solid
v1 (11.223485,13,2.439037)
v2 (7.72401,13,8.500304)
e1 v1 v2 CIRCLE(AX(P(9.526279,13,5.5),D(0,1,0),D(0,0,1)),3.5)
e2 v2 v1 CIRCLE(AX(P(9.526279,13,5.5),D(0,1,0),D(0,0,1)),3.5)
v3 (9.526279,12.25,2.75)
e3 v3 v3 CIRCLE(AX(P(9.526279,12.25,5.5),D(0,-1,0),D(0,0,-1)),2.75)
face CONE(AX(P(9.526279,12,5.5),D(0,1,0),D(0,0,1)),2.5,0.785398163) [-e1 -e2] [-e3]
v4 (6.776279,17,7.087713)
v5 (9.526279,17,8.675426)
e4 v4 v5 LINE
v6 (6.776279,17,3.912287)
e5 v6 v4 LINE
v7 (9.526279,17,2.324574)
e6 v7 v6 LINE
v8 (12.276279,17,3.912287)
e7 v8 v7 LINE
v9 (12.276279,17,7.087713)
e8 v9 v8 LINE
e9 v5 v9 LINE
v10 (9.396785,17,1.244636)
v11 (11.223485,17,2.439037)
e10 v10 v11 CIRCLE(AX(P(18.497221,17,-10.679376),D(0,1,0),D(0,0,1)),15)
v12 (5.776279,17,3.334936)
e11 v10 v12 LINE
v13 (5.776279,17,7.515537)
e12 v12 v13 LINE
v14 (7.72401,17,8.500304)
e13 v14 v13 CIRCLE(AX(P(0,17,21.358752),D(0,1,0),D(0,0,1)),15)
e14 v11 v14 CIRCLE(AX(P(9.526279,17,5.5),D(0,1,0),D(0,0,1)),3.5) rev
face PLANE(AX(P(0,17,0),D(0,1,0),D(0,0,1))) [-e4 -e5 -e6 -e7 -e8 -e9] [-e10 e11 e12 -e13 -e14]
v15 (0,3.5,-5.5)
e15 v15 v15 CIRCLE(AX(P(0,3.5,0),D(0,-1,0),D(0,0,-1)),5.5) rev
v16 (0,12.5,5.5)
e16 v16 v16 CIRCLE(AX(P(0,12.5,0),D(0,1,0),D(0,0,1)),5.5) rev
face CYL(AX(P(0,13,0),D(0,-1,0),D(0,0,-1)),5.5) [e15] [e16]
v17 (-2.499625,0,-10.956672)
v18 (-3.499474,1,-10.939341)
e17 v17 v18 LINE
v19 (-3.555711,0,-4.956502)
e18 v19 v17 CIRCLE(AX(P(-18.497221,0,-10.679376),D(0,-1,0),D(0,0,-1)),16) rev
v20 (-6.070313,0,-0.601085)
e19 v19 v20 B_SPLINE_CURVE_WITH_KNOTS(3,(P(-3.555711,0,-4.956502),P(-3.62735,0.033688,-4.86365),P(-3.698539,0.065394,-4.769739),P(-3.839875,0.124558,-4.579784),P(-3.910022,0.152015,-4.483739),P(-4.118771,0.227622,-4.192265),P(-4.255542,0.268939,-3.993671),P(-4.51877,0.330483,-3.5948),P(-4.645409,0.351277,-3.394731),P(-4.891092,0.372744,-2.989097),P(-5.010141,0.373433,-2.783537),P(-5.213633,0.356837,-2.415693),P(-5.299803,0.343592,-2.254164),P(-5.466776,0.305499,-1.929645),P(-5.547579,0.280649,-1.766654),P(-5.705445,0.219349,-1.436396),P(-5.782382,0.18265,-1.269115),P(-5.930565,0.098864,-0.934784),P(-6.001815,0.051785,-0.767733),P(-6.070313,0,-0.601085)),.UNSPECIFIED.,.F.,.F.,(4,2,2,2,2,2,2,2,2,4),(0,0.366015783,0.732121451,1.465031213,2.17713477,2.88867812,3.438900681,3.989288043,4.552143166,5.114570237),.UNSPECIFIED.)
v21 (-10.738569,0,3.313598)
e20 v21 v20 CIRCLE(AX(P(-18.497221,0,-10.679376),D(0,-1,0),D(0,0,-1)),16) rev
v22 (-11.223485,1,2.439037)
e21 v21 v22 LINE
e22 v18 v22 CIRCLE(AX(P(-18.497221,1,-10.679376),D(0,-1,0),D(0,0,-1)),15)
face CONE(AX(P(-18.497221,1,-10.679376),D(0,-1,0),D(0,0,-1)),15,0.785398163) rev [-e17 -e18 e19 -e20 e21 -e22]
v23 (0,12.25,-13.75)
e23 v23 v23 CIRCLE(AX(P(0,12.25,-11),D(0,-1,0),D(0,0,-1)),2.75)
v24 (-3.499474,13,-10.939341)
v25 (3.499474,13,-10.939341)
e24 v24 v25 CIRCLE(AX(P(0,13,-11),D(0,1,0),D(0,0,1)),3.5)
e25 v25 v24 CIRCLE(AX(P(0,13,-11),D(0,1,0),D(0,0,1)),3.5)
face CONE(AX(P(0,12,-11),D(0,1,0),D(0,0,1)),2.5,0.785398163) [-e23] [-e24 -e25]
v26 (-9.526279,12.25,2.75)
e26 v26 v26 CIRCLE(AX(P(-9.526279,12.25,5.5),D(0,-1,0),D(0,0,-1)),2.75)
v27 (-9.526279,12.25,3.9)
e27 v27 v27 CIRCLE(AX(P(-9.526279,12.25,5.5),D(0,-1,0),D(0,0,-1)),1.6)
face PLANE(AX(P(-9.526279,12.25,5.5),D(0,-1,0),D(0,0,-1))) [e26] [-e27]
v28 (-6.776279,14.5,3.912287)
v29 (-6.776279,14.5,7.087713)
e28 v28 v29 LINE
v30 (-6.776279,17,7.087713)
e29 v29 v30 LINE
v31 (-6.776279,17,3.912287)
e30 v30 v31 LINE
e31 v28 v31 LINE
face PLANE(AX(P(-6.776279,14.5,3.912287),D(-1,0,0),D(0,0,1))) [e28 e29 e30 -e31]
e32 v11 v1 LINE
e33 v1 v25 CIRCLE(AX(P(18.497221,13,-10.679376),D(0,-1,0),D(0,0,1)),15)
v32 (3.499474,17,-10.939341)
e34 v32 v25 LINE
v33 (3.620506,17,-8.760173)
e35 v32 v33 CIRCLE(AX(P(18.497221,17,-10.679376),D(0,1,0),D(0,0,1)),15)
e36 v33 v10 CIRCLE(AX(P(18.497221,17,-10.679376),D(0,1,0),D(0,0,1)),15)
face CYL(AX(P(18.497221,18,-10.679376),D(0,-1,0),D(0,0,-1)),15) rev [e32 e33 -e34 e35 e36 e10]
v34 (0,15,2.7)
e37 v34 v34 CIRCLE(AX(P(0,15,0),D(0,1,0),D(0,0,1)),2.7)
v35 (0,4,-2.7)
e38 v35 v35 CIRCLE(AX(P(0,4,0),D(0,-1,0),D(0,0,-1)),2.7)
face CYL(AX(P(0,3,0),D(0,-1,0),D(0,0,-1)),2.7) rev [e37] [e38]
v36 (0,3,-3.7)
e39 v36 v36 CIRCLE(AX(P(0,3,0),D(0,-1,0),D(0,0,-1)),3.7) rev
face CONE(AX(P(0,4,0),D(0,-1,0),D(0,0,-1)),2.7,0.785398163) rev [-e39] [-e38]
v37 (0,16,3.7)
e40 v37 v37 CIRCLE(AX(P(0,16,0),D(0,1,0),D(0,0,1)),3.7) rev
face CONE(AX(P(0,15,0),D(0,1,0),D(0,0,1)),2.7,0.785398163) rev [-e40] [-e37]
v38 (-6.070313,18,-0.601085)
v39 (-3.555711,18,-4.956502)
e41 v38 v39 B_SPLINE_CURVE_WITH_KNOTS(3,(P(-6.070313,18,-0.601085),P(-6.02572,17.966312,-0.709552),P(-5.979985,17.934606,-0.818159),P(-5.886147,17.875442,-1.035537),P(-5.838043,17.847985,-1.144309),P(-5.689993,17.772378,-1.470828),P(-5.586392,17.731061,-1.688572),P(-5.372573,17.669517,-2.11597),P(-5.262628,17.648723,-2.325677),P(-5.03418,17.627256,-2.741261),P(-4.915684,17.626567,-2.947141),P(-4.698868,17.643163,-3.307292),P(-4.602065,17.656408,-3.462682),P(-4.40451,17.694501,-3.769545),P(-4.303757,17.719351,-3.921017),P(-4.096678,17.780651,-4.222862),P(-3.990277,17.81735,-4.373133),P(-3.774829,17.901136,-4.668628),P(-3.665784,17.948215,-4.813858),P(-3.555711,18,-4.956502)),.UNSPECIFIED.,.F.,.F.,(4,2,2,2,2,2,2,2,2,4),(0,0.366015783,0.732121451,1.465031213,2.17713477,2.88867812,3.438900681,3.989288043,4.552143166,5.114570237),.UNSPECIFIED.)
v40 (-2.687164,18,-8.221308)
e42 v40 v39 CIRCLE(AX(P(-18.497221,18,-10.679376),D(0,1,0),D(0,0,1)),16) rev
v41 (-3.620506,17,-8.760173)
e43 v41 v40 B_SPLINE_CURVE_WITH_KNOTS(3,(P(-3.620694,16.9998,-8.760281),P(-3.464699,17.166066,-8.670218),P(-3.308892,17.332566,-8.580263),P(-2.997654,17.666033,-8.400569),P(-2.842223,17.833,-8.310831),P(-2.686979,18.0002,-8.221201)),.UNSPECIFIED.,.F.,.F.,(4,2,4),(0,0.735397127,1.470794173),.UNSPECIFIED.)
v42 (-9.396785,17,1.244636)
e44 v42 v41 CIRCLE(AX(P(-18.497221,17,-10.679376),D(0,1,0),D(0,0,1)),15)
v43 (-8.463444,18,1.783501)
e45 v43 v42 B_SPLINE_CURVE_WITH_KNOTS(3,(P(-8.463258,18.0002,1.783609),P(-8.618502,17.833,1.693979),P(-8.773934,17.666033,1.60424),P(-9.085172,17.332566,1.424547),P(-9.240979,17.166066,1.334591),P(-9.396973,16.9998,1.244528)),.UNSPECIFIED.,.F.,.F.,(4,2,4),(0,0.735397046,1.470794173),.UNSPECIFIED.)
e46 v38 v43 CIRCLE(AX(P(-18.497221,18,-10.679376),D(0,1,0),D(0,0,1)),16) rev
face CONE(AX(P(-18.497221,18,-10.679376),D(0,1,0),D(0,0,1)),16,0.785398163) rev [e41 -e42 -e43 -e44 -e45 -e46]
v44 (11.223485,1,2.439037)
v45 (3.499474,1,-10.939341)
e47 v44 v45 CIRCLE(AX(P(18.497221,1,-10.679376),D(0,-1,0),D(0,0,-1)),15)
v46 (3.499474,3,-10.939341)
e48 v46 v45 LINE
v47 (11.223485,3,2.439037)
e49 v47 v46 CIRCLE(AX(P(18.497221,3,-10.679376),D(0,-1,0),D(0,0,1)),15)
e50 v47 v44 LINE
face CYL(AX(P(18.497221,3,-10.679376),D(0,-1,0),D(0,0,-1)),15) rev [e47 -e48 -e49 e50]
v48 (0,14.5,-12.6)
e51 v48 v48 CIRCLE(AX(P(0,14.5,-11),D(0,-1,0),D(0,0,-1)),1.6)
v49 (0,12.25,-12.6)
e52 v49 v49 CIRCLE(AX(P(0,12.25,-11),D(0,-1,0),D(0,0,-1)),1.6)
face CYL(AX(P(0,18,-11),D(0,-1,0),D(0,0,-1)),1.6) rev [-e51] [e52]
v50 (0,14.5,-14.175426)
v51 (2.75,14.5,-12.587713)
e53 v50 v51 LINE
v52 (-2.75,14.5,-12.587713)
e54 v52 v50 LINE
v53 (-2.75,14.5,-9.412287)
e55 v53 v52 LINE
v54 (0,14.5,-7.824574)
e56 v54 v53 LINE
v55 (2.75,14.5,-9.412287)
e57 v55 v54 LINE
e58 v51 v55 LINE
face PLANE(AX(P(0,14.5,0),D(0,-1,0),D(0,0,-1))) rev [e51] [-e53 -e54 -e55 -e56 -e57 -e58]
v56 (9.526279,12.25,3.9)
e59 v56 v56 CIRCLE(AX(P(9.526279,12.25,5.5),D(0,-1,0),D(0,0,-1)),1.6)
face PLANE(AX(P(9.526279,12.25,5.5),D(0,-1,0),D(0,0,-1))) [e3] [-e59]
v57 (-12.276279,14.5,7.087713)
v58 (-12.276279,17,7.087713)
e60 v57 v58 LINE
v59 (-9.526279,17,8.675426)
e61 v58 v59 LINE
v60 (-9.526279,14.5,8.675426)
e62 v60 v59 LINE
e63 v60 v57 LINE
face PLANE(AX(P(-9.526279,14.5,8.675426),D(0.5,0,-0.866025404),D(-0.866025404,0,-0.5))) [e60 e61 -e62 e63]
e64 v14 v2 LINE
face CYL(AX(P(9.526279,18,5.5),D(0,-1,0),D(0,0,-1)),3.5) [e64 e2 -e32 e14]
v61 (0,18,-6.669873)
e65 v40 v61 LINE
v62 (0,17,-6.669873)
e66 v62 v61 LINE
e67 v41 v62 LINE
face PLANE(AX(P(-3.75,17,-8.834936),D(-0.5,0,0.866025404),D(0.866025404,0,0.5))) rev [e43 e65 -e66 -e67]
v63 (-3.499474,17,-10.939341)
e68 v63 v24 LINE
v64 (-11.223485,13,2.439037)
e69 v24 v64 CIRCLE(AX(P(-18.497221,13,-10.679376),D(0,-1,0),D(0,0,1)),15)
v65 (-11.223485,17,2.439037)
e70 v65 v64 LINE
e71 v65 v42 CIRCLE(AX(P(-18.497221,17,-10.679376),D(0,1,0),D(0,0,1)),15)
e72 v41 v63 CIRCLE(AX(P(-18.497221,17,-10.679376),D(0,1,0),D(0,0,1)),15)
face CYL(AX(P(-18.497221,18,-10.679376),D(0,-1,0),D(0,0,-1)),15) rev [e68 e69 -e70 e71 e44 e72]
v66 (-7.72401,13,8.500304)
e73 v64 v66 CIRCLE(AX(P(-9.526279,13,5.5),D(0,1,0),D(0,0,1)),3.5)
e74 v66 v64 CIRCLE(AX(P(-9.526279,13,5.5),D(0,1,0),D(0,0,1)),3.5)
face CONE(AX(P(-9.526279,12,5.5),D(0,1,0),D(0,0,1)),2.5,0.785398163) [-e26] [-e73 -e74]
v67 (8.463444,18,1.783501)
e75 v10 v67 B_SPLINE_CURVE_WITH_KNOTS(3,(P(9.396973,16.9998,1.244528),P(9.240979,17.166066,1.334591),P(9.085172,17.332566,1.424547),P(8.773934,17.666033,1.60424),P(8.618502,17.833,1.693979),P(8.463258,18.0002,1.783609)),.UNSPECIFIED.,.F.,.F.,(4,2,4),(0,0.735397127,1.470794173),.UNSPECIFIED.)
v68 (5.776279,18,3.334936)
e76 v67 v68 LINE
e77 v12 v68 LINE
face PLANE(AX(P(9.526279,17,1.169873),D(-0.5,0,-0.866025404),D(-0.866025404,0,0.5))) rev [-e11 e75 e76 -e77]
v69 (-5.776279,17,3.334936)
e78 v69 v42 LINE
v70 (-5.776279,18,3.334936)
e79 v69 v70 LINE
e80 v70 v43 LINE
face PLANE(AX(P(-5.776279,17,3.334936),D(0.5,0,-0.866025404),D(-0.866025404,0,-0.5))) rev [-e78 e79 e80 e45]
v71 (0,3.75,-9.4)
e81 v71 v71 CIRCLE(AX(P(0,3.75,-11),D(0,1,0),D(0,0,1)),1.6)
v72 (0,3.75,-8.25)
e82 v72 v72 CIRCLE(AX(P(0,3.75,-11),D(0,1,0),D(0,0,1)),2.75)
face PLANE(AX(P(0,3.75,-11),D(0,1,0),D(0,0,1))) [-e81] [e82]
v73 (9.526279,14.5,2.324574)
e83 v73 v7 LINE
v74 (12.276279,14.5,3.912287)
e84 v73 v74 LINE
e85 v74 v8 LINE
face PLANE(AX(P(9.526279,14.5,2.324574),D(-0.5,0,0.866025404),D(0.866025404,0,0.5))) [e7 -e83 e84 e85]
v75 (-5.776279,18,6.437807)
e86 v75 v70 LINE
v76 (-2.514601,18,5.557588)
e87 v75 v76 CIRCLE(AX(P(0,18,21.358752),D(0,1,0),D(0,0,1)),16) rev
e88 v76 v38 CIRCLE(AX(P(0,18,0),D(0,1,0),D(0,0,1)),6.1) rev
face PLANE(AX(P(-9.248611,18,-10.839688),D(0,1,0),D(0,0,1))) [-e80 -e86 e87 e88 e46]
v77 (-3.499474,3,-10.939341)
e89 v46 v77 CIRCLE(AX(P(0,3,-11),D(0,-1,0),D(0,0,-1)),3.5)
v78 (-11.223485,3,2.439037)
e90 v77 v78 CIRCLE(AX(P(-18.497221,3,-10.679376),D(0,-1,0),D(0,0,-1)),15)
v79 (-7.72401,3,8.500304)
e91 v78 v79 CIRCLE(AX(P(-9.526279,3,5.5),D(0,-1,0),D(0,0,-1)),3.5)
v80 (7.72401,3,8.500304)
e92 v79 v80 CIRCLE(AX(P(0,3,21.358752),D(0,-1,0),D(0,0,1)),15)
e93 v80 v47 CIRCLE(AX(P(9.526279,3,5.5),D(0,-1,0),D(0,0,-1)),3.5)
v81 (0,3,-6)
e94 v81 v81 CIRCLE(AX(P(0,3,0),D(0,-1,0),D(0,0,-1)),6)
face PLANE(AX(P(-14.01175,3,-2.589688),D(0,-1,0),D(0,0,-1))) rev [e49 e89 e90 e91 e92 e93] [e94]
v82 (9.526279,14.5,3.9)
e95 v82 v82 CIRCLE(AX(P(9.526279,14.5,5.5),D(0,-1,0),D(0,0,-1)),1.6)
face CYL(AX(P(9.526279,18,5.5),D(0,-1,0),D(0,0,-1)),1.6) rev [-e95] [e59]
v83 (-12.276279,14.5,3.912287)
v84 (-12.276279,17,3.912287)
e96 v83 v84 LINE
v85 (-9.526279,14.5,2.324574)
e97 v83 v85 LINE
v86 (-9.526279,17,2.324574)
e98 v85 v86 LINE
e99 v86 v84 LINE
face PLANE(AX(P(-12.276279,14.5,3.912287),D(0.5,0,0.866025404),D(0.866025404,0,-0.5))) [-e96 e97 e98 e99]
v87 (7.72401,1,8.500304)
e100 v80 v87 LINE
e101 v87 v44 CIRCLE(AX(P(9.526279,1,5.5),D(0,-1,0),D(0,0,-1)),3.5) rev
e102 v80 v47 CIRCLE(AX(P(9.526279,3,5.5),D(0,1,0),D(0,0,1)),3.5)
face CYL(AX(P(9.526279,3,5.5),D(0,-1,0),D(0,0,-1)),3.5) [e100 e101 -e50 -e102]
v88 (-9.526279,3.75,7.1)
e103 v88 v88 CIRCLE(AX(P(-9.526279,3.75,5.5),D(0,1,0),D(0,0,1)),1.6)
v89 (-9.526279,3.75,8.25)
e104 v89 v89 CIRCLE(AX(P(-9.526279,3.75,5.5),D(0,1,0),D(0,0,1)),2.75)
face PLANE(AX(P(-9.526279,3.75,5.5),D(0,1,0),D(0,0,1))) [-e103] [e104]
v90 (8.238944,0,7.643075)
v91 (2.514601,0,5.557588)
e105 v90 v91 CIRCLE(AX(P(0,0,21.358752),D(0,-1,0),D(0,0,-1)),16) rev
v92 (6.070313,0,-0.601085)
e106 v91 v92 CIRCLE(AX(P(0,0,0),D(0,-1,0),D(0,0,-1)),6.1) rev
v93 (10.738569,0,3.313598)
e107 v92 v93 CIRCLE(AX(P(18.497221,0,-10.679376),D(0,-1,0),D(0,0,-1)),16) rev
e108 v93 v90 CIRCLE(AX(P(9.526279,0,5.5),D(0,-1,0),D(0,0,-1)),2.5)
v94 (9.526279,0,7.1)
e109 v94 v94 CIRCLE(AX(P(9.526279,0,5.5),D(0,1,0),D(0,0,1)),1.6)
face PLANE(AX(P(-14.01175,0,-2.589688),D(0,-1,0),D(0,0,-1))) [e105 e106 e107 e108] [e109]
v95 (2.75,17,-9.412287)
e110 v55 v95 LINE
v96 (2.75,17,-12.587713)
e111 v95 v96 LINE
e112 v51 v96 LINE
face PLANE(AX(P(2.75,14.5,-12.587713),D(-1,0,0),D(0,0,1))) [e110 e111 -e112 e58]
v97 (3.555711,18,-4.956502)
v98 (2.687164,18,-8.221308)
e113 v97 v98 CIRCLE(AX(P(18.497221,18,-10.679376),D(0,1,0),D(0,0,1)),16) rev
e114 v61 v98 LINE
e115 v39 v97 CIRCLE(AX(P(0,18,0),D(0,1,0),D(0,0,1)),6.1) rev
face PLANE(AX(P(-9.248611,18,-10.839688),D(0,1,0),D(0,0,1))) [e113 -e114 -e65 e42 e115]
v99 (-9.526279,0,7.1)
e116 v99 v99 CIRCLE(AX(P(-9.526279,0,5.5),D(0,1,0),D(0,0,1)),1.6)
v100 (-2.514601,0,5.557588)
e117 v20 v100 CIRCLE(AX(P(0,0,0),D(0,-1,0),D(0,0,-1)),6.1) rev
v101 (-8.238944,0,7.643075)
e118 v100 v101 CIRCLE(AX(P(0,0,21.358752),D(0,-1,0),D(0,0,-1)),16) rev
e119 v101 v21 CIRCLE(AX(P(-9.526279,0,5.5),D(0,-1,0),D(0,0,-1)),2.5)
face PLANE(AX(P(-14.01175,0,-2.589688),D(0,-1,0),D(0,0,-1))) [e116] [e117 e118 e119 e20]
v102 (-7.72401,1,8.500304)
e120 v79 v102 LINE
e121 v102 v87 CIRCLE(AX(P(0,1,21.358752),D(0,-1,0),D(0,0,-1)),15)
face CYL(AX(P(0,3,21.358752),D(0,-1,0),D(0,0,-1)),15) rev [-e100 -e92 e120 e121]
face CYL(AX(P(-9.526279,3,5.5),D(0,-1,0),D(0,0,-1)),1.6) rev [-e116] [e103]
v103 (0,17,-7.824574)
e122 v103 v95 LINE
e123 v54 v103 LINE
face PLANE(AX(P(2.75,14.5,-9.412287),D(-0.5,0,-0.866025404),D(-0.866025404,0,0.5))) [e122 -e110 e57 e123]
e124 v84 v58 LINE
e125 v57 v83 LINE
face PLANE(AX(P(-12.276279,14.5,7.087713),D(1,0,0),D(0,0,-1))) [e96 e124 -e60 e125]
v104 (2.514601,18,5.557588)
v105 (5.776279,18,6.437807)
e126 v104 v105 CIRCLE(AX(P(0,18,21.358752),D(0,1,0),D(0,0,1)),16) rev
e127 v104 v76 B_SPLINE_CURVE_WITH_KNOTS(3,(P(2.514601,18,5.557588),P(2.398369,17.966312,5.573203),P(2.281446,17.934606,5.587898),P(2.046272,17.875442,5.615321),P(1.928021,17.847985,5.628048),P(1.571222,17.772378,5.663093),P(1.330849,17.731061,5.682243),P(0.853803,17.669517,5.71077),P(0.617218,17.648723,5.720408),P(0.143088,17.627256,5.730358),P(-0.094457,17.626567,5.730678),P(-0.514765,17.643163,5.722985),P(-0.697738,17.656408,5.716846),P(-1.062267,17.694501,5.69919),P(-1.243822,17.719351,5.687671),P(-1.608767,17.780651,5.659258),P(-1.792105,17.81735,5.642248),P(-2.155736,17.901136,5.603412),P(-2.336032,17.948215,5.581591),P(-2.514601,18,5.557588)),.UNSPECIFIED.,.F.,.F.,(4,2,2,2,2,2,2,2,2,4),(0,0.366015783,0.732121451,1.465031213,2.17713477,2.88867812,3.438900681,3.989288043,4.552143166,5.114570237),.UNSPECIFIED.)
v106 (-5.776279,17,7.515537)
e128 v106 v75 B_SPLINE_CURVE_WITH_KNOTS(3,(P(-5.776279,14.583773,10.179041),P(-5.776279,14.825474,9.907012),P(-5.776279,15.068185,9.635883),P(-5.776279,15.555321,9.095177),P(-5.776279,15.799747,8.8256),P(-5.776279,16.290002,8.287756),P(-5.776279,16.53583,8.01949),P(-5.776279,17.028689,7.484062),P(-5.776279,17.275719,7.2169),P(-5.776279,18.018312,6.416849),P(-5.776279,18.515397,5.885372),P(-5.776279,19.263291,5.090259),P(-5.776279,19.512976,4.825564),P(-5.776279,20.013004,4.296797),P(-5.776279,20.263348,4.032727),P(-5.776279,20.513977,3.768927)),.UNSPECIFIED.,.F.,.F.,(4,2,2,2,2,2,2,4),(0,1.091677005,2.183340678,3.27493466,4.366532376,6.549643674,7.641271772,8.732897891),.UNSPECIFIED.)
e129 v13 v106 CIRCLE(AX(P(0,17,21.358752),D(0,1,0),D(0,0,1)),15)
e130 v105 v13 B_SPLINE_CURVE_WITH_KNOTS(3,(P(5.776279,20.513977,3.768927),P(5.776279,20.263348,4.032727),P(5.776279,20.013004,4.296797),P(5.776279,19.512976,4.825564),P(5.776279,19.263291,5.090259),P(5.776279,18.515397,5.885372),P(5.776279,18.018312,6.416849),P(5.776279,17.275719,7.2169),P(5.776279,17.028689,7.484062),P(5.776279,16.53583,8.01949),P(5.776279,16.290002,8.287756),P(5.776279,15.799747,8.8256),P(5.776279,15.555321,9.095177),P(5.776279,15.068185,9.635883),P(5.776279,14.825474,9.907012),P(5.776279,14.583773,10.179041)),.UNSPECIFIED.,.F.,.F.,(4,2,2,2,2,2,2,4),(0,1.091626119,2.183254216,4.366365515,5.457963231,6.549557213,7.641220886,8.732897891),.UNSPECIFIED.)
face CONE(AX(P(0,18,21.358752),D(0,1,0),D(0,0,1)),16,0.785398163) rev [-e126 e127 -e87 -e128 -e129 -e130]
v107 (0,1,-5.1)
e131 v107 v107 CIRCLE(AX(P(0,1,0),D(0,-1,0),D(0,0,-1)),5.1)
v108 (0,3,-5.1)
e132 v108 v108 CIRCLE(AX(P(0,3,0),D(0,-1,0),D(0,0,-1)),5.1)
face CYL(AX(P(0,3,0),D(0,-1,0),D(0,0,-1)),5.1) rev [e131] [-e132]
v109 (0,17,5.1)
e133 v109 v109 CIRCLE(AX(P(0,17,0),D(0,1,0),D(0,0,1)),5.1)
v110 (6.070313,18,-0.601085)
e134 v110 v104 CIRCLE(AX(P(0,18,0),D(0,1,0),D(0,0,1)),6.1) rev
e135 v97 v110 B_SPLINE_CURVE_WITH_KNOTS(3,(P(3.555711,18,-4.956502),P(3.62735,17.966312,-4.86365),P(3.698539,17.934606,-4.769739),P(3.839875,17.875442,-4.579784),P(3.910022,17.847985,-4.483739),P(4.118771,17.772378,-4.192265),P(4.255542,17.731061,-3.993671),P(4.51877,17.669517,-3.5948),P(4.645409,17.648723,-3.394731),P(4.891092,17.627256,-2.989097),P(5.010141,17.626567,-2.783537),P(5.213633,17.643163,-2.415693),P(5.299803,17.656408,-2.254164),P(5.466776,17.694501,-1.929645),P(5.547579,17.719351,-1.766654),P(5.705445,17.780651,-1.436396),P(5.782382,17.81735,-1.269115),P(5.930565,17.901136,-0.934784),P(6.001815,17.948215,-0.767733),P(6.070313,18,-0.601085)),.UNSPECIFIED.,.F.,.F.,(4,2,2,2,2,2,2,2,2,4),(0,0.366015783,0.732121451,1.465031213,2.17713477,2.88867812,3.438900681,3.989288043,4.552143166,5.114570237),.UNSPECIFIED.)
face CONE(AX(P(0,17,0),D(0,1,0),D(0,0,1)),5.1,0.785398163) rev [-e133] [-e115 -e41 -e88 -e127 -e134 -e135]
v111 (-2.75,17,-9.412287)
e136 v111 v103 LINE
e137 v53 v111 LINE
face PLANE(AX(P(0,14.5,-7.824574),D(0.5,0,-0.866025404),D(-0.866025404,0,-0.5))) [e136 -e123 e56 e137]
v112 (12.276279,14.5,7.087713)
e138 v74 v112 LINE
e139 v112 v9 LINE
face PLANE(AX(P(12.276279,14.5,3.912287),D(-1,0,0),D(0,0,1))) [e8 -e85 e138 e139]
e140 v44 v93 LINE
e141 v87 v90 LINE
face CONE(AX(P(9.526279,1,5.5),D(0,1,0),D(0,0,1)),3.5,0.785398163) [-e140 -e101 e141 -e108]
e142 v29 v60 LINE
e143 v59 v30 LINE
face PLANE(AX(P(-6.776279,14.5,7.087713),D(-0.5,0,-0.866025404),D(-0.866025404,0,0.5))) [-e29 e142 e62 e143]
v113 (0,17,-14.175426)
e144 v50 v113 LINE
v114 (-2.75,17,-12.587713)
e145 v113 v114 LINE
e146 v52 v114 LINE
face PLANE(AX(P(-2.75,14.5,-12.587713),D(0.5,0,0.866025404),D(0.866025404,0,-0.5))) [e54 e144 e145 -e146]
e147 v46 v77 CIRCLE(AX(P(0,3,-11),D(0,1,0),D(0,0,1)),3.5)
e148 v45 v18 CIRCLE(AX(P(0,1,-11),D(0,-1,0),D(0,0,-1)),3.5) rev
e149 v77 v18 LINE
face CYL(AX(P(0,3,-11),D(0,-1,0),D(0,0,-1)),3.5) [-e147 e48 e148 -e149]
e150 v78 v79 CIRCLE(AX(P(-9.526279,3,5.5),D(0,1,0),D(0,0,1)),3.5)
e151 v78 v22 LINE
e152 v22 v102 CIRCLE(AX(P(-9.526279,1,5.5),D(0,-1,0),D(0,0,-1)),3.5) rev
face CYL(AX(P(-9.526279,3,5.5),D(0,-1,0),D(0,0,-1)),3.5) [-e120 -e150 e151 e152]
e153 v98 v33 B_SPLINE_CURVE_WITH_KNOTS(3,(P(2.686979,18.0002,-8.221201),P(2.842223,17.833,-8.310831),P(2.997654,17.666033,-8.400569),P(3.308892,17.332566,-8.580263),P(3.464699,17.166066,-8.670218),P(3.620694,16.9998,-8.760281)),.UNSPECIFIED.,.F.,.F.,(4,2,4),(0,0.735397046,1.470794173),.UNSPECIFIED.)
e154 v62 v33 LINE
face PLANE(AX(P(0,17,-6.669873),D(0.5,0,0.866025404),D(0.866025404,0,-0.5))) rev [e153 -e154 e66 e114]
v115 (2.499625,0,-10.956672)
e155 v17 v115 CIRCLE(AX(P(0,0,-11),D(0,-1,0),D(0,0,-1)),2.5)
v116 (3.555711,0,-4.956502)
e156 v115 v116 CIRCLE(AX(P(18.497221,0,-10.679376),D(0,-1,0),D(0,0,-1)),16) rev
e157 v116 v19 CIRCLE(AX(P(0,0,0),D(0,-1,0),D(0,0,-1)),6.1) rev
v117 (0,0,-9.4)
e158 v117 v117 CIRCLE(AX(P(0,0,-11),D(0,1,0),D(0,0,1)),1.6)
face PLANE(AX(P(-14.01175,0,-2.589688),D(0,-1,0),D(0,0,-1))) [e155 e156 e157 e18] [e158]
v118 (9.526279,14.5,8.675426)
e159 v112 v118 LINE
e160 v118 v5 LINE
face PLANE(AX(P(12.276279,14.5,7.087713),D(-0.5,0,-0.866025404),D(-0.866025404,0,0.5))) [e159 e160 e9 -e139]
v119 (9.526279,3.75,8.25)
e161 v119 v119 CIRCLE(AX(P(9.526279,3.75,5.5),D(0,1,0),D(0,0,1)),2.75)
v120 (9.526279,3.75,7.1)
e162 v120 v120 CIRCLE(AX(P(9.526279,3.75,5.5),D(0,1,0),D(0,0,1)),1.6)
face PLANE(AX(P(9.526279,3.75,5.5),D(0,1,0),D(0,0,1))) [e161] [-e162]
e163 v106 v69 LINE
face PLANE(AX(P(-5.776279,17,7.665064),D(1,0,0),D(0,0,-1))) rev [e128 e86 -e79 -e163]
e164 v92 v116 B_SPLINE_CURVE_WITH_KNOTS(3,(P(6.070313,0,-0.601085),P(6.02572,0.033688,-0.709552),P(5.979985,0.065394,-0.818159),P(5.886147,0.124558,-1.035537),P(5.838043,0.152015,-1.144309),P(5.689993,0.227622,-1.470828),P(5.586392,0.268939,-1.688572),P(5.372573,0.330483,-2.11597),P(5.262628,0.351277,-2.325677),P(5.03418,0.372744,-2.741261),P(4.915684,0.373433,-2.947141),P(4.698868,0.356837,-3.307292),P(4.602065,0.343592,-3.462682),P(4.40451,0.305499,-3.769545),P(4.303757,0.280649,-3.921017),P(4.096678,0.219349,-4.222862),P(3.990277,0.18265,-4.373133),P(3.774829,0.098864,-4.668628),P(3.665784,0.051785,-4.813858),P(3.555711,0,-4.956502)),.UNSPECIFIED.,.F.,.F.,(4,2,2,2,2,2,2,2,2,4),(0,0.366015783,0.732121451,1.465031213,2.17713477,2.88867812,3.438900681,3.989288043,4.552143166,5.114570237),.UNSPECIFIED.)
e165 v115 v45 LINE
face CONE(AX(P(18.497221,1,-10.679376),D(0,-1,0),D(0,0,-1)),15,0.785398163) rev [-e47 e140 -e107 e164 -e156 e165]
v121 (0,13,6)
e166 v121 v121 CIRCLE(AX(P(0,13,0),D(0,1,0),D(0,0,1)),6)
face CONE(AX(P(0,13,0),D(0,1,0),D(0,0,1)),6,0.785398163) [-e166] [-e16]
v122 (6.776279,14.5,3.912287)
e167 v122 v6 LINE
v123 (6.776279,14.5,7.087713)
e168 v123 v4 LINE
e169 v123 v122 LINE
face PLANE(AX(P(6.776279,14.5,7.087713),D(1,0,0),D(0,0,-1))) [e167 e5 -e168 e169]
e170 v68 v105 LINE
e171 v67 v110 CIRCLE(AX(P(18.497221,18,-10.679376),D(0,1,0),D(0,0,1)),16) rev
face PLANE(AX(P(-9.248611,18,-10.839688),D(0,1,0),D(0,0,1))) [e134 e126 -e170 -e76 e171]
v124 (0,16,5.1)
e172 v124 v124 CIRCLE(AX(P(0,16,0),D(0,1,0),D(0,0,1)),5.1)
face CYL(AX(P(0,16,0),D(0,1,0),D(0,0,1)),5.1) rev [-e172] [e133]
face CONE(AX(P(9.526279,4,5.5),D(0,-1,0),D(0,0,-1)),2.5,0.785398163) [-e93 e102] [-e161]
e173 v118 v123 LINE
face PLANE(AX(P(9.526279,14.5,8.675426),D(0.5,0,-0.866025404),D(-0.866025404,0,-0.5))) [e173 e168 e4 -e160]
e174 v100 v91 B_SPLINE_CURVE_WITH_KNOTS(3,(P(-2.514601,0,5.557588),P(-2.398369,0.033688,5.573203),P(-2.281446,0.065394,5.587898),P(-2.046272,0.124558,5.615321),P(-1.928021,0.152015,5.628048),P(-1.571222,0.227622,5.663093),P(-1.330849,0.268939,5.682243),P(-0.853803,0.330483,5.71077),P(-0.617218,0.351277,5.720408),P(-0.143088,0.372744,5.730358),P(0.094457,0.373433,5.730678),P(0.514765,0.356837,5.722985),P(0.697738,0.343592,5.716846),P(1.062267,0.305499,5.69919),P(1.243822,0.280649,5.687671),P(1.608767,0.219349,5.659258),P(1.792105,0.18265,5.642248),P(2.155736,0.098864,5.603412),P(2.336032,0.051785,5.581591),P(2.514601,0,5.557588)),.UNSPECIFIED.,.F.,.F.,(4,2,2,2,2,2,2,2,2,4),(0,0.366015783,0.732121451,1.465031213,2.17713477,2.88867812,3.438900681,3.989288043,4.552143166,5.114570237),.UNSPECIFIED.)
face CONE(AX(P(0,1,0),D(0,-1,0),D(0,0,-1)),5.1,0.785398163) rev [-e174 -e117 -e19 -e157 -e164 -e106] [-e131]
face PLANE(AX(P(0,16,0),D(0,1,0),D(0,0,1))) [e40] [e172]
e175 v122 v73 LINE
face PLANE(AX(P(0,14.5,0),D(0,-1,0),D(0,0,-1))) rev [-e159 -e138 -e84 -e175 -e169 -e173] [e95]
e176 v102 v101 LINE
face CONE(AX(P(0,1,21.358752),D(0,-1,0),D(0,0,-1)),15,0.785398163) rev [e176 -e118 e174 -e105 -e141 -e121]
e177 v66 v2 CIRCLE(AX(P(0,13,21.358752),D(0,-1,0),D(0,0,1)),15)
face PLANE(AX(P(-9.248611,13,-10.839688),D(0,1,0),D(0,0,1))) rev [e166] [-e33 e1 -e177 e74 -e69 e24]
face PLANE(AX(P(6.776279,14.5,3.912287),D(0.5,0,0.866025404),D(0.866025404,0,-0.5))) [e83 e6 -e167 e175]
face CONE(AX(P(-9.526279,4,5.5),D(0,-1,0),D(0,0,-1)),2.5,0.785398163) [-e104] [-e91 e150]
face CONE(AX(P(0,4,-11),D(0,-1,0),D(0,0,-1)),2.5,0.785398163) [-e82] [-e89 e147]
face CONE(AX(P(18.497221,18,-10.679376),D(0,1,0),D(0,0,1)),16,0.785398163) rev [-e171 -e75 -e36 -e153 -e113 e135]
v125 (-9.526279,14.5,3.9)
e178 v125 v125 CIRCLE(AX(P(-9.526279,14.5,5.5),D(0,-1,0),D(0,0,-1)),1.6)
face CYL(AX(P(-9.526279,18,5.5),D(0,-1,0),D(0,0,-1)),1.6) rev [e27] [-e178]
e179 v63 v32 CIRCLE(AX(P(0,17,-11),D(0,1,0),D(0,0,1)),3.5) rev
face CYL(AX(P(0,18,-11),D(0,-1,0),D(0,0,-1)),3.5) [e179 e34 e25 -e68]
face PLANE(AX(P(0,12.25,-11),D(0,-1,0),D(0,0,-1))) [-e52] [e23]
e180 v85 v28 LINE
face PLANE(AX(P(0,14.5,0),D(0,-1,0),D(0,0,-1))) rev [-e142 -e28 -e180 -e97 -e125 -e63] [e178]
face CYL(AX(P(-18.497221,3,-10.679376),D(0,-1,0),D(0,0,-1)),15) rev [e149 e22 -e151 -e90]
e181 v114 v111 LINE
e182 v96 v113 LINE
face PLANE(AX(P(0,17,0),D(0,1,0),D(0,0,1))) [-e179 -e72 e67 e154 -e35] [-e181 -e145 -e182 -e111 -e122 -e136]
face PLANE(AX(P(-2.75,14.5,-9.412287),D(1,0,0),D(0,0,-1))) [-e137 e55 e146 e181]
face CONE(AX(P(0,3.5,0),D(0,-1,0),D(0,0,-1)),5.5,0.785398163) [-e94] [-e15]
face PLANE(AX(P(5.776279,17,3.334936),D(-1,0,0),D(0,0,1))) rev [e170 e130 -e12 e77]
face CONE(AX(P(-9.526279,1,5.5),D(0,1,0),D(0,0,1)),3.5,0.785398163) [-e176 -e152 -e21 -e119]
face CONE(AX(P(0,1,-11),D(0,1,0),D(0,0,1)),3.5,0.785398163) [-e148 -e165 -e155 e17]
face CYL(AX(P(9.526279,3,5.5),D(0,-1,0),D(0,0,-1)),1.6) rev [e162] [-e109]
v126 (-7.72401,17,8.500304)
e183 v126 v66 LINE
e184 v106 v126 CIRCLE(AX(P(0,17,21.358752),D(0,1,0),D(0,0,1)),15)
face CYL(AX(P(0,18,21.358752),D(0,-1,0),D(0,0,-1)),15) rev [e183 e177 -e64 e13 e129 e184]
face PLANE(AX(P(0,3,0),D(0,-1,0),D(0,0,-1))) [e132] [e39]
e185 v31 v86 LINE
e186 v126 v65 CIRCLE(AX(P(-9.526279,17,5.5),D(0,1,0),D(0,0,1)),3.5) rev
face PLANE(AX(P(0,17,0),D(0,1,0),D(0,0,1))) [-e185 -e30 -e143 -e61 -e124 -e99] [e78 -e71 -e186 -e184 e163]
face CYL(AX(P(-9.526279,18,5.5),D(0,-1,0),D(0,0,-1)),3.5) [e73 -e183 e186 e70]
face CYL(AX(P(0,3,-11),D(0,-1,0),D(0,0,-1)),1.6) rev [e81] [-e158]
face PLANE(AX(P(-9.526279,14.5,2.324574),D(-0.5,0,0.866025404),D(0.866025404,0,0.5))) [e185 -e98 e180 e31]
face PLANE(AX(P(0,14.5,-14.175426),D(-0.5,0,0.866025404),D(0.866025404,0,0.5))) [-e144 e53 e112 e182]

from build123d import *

# Parameters (mm, degrees)
SKETCH1_R           = 1.6
SKETCH1_R_2         = 2.7
BOSS_EXTRUDE1_DEPTH = 3
SKETCH2_R           = 5.5
SKETCH2_R_2         = 2.7
BOSS_EXTRUDE2_DEPTH = 10
SKETCH3_R           = 2.7
SKETCH3_R_2         = 1.6
BOSS_EXTRUDE3_DEPTH = 5
CUT_EXTRUDE2_DEPTH  = 3.5
SKETCH8_R           = 2.5
SKETCH8_R_2         = 1.6
BOSS_EXTRUDE5_DEPTH = 0.75
BOSS_EXTRUDE6_START = 0.75
SKETCH9_R           = 2.5
SKETCH9_R_2         = 1.6
BOSS_EXTRUDE6_DEPTH = 0.75
SKETCH10_R          = 5.1
CUT_EXTRUDE3_DEPTH  = 2
CUT_EXTRUDE4_START  = -3
SKETCH11_R          = 5.1
CUT_EXTRUDE4_DEPTH  = 3
CHAMFER1_SIZE       = 1
CHAMFER2_SIZE       = 1
CHAMFER3_SIZE       = 1
CUT_EXTRUDE5_DEPTH  = 1
CHAMFER4_SIZE       = 0.5
CHAMFER5_SIZE       = 1


with BuildPart() as part:
    # Sketch1 → Boss-Extrude1 (new body)
    with BuildSketch(Plane(origin=(0, 0, 0), x_dir=(1, 0, 0), z_dir=(0, 1, 0))):
        with BuildLine():
            ThreePointArc((3.499474322, 10.939341361), (0, 14.5), (-3.499474322, 10.939341361))
            ThreePointArc((-3.499474322, 10.939341361), (-5.506840359, 3.179375764), (-11.22348468, -2.439037018))
            ThreePointArc((-11.22348468, -2.439037018), (-12.557368355, -7.25), (-7.724010358, -8.500304343))
            ThreePointArc((-7.724010358, -8.500304343), (0, -6.358751527), (7.724010358, -8.500304343))
            ThreePointArc((7.724010358, -8.500304343), (12.557368355, -7.25), (11.22348468, -2.439037018))
            ThreePointArc((11.22348468, -2.439037018), (5.506840359, 3.179375764), (3.499474322, 10.939341361))
        make_face()
        with Locations(Location((0, 11, 0), (0, 0, 270))):
            Circle(SKETCH1_R, mode=Mode.SUBTRACT)
        with Locations(Location((9.526279442, -5.5, 0), (0, 0, 270))):
            Circle(SKETCH1_R, mode=Mode.SUBTRACT)
        with Locations(Location((-9.526279442, -5.5, 0), (0, 0, 270))):
            Circle(SKETCH1_R, mode=Mode.SUBTRACT)
        with Locations(Location((0, 0, 0), (0, 0, 270))):
            Circle(SKETCH1_R_2, mode=Mode.SUBTRACT)
    extrude(amount=BOSS_EXTRUDE1_DEPTH)

    # Sketch2 → Boss-Extrude2 (add)
    with BuildSketch(Plane(origin=(0, 3, 0), x_dir=(1, 0, 0), z_dir=(0, 1, 0))):
        with Locations(Location((0, 0, 0), (0, 0, 270))):
            Circle(SKETCH2_R)
        with Locations(Location((0, 0, 0), (0, 0, 270))):
            Circle(SKETCH2_R_2, mode=Mode.SUBTRACT)
    extrude(amount=BOSS_EXTRUDE2_DEPTH)

    # Sketch3 → Boss-Extrude3 (add)
    with BuildSketch(Plane(origin=(0, 13, 0), x_dir=(1, 0, 0), z_dir=(0, 1, 0))):
        with BuildLine():
            ThreePointArc((-11.22348468, -2.439037018), (-5.506840359, 3.179375764), (-3.499474322, 10.939341361))
            ThreePointArc((-3.499474322, 10.939341361), (0, 14.5), (3.499474322, 10.939341361))
            ThreePointArc((3.499474322, 10.939341361), (5.506840359, 3.179375764), (11.22348468, -2.439037018))
            ThreePointArc((11.22348468, -2.439037018), (12.557368355, -7.25), (7.724010358, -8.500304343))
            ThreePointArc((7.724010358, -8.500304343), (0, -6.358751527), (-7.724010358, -8.500304343))
            ThreePointArc((-7.724010358, -8.500304343), (-12.557368355, -7.25), (-11.22348468, -2.439037018))
        make_face()
        with Locations(Location((0, 0, 0), (0, 0, 270))):
            Circle(SKETCH3_R, mode=Mode.SUBTRACT)
        with Locations(Location((-9.526279442, -5.5, 0), (0, 0, 270))):
            Circle(SKETCH3_R_2, mode=Mode.SUBTRACT)
        with Locations(Location((9.526279442, -5.5, 0), (0, 0, 270))):
            Circle(SKETCH3_R_2, mode=Mode.SUBTRACT)
        with Locations(Location((0, 11, 0), (0, 0, 270))):
            Circle(SKETCH3_R_2, mode=Mode.SUBTRACT)
    extrude(amount=BOSS_EXTRUDE3_DEPTH)

    # Sketch6 → Cut-Extrude2 (cut)
    with BuildSketch(Plane.XZ.offset(-18)):
        Polygon((-12.276279442, 3.91228676), (-9.526279442, 2.324573519), (-6.776279442, 3.91228676), (-6.776279442, 7.08771324), (-9.526279442, 8.675426481), (-12.276279442, 7.08771324), align=None)
        Polygon((2.75, -12.58771324), (2.75, -9.41228676), (0, -7.824573519), (-2.75, -9.41228676), (-2.75, -12.58771324), (0, -14.175426481), align=None)
        Polygon((9.526279442, 8.675426481), (6.776279442, 7.08771324), (6.776279442, 3.91228676), (9.526279442, 2.324573519), (12.276279442, 3.91228676), (12.276279442, 7.08771324), align=None)
    extrude(amount=CUT_EXTRUDE2_DEPTH, mode=Mode.SUBTRACT)

    # Sketch8 → Boss-Extrude5 (add)
    # profile 1 of 3: a face of its own
    with BuildSketch(Plane(origin=(0, 3, 0), x_dir=(1, 0, 0), z_dir=(0, 1, 0))):
        with Locations(Location((-9.526279442, -5.5, 0), (0, 0, 90))):
            Circle(SKETCH8_R)
        with Locations(Location((-9.526279442, -5.5, 0), (0, 0, 270))):
            Circle(SKETCH8_R_2, mode=Mode.SUBTRACT)
    # profile 2 of 3: a face of its own
    with BuildSketch(Plane(origin=(0, 3, 0), x_dir=(1, 0, 0), z_dir=(0, 1, 0))):
        with Locations(Location((0, 11, 0), (0, 0, 90))):
            Circle(SKETCH8_R)
        with Locations(Location((0, 11, 0), (0, 0, 270))):
            Circle(SKETCH8_R_2, mode=Mode.SUBTRACT)
    # profile 3 of 3: a face of its own
    with BuildSketch(Plane(origin=(0, 3, 0), x_dir=(1, 0, 0), z_dir=(0, 1, 0))):
        with Locations(Location((9.526279442, -5.5, 0), (0, 0, 90))):
            Circle(SKETCH8_R)
        with Locations(Location((9.526279442, -5.5, 0), (0, 0, 270))):
            Circle(SKETCH8_R_2, mode=Mode.SUBTRACT)
    extrude(amount=BOSS_EXTRUDE5_DEPTH)

    # Sketch9 → Boss-Extrude6 (add)
    # profile 1 of 3: a face of its own
    with BuildSketch(Plane.XZ.offset(-13).offset(BOSS_EXTRUDE6_START)):
        with Locations(Location((0, -11, 0), (0, 0, 270))):
            Circle(SKETCH9_R)
        with Locations(Location((0, -11, 0), (0, 0, 90))):
            Circle(SKETCH9_R_2, mode=Mode.SUBTRACT)
    # profile 2 of 3: a face of its own
    with BuildSketch(Plane.XZ.offset(-13).offset(BOSS_EXTRUDE6_START)):
        with Locations(Location((-9.526279442, 5.5, 0), (0, 0, 270))):
            Circle(SKETCH9_R)
        with Locations(Location((-9.526279442, 5.5, 0), (0, 0, 90))):
            Circle(SKETCH9_R_2, mode=Mode.SUBTRACT)
    # profile 3 of 3: a face of its own
    with BuildSketch(Plane.XZ.offset(-13).offset(BOSS_EXTRUDE6_START)):
        with Locations(Location((9.526279442, 5.5, 0), (0, 0, 270))):
            Circle(SKETCH9_R)
        with Locations(Location((9.526279442, 5.5, 0), (0, 0, 90))):
            Circle(SKETCH9_R_2, mode=Mode.SUBTRACT)
    extrude(amount=-BOSS_EXTRUDE6_DEPTH)

    # Sketch10 → Cut-Extrude3 (cut)
    with BuildSketch(Plane(origin=(0, 18, 0), x_dir=(1, 0, 0), z_dir=(0, 1, 0))):
        with Locations(Location((0, 0, 0), (0, 0, 270))):
            Circle(SKETCH10_R)
    extrude(amount=-CUT_EXTRUDE3_DEPTH, mode=Mode.SUBTRACT)

    # Sketch11 → Cut-Extrude4 (cut)
    with BuildSketch(Plane.XZ.offset(CUT_EXTRUDE4_START)):
        with Locations(Location((0, 0, 0), (0, 0, 90))):
            Circle(SKETCH11_R)
    extrude(amount=CUT_EXTRUDE4_DEPTH, mode=Mode.SUBTRACT)

    # Chamfer1
    # the kernel refuses this chamfer: 1 mm, written as the material it takes off along each edge
    with BuildSketch(Plane(origin=(0, 0, -11), x_dir=(0.9998498062505288, 0, 0.017331039806656685), z_dir=(-0.017331039806656685, 0, 0.9998498062505288))) as chamfer1_piece_1:
        Polygon((3.5, CHAMFER1_SIZE), (3.5 - CHAMFER1_SIZE, 0), (3.5, 0), align=None)
    revolve(axis=Axis((0, 0, -11), (0, 1, 0)), revolution_arc=181.986090305, mode=Mode.SUBTRACT)
    with BuildSketch(Plane(origin=(9.526279442, 0, 5.5), x_dir=(-0.5149340238718285, 0, 0.8572298122785786), z_dir=(-0.8572298122785786, 0, -0.5149340238718285))) as chamfer1_piece_2:
        Polygon((3.5 - CHAMFER1_SIZE, 0), (3.5, CHAMFER1_SIZE), (3.5, 0), align=None)
    revolve(axis=Axis((9.526279442, 0, 5.5), (0, 1, 0)), revolution_arc=181.986090305, mode=Mode.SUBTRACT)
    with BuildSketch(Plane(origin=(0, 0, 21.358751527), x_dir=(-0.514934023871828, 0, -0.857229812278579), z_dir=(-0.857229812278579, 0, 0.514934023871828))) as chamfer1_piece_3:
        Polygon((15 + CHAMFER1_SIZE, 0), (15, -CHAMFER1_SIZE), (15, 0), align=None)
    revolve(axis=Axis((0, 0, 21.358751527), (0, -1, 0)), revolution_arc=61.986090305, mode=Mode.SUBTRACT)
    with BuildSketch(Plane(origin=(-9.526279442, 0, 5.5), x_dir=(-0.4849157823787002, 0, -0.8745608520852354), z_dir=(0.8745608520852354, 0, -0.4849157823787002))) as chamfer1_piece_4:
        Polygon((3.5 - CHAMFER1_SIZE, 0), (3.5, CHAMFER1_SIZE), (3.5, 0), align=None)
    revolve(axis=Axis((-9.526279442, 0, 5.5), (0, 1, 0)), revolution_arc=181.986090305, mode=Mode.SUBTRACT)
    with BuildSketch(Plane(origin=(0, 18, -11), x_dir=(-0.9998498062505289, 0, 0.017331039806656172), z_dir=(0.017331039806656172, 0, 0.9998498062505289))) as chamfer1_piece_5:
        Polygon((3.5, CHAMFER1_SIZE), (3.5 - CHAMFER1_SIZE, 0), (3.5, 0), align=None)
    revolve(axis=Axis((0, 18, -11), (0, -1, 0)), revolution_arc=181.986090305, mode=Mode.SUBTRACT)
    with BuildSketch(Plane(origin=(-9.526279442, 18, 5.5), x_dir=(0.5149340238718281, 0, 0.8572298122785789), z_dir=(0.8572298122785789, 0, -0.5149340238718281))) as chamfer1_piece_6:
        Polygon((3.5, CHAMFER1_SIZE), (3.5 - CHAMFER1_SIZE, 0), (3.5, 0), align=None)
    revolve(axis=Axis((-9.526279442, 18, 5.5), (0, -1, 0)), revolution_arc=181.986090305, mode=Mode.SUBTRACT)
    with BuildSketch(Plane(origin=(9.526279442, 18, 5.5), x_dir=(0.4849157823786986, 0, -0.8745608520852363), z_dir=(-0.8745608520852363, 0, -0.4849157823786986))) as chamfer1_piece_7:
        Polygon((3.5, CHAMFER1_SIZE), (3.5 - CHAMFER1_SIZE, 0), (3.5, 0), align=None)
    revolve(axis=Axis((9.526279442, 18, 5.5), (0, -1, 0)), revolution_arc=181.986090305, mode=Mode.SUBTRACT)
    with BuildSketch(Plane(origin=(0, 18, 21.358751527), x_dir=(0.5149340238718284, 0, -0.8572298122785788), z_dir=(0.8572298122785788, 0, 0.5149340238718284))) as chamfer1_piece_8:
        Polygon((15, -CHAMFER1_SIZE), (15 + CHAMFER1_SIZE, 0), (15, 0), align=None)
    revolve(axis=Axis((0, 18, 21.358751527), (0, 1, 0)), revolution_arc=61.986090305, mode=Mode.SUBTRACT)
    with BuildSketch(Plane(origin=(18.497221416, 0, -10.679375764), x_dir=(-0.48491578237870064, 0, 0.8745608520852353), z_dir=(0.8745608520852353, 0, 0.48491578237870064))) as chamfer1_piece_9:
        Polygon((15, -CHAMFER1_SIZE), (15 + CHAMFER1_SIZE, 0), (15, 0), align=None)
    revolve(axis=Axis((18.497221416, 0, -10.679375764), (0, -1, 0)), revolution_arc=61.986090305, mode=Mode.SUBTRACT)
    with BuildSketch(Plane(origin=(-18.497221416, 0, -10.679375764), x_dir=(0.9998498062505289, 0, -0.017331039806656054), z_dir=(-0.017331039806656054, 0, -0.9998498062505289))) as chamfer1_piece_10:
        Polygon((15, -CHAMFER1_SIZE), (15 + CHAMFER1_SIZE, 0), (15, 0), align=None)
    revolve(axis=Axis((-18.497221416, 0, -10.679375764), (0, -1, 0)), revolution_arc=61.986090305, mode=Mode.SUBTRACT)
    with BuildSketch(Plane(origin=(-18.497221416, 18, -10.679375764), x_dir=(0.4849157823787007, 0, 0.8745608520852352), z_dir=(-0.8745608520852352, 0, 0.4849157823787007))) as chamfer1_piece_11:
        Polygon((15, -CHAMFER1_SIZE), (15 + CHAMFER1_SIZE, 0), (15, 0), align=None)
    revolve(axis=Axis((-18.497221416, 18, -10.679375764), (0, 1, 0)), revolution_arc=61.986090305, mode=Mode.SUBTRACT)
    with BuildSketch(Plane(origin=(18.497221416, 18, -10.679375764), x_dir=(-0.9998498062505289, 0, -0.017331039806656425), z_dir=(0.017331039806656425, 0, -0.9998498062505289))) as chamfer1_piece_12:
        Polygon((15, -CHAMFER1_SIZE), (15 + CHAMFER1_SIZE, 0), (15, 0), align=None)
    revolve(axis=Axis((18.497221416, 18, -10.679375764), (0, 1, 0)), revolution_arc=61.986090305, mode=Mode.SUBTRACT)

    # Chamfer2
    # the kernel refuses this chamfer: 1 mm, written as the material it takes off along each edge
    with BuildSketch(Plane(origin=(0, 18, 0), x_dir=(0, 0, 1), z_dir=(-1, 0, 0))) as chamfer2_piece_1:
        Polygon((5.1 + CHAMFER2_SIZE, 0), (5.1, -CHAMFER2_SIZE), (5.1, 0), align=None)
    revolve(axis=Axis((0, 18, 0), (0, 1, 0)), mode=Mode.SUBTRACT)
    with BuildSketch(Plane(origin=(0, 0, 0), x_dir=(0, 0, 1), z_dir=(1, 0, 0))) as chamfer2_piece_2:
        Polygon((5.1 + CHAMFER2_SIZE, 0), (5.1, -CHAMFER2_SIZE), (5.1, 0), align=None)
    revolve(axis=Axis((0, 0, 0), (0, -1, 0)), mode=Mode.SUBTRACT)

    # Chamfer3
    # the kernel refuses this chamfer: 1 mm, written as the material it adds along each edge
    with BuildSketch(Plane(origin=(9.526279442, 3, 5.5), x_dir=(0, 0, -1), z_dir=(1, 0, 0))) as chamfer3_piece_1_section:
        Polygon((2.5 + CHAMFER3_SIZE, 0), (2.5, CHAMFER3_SIZE), (2.5, 0), align=None)
    chamfer3_piece_1 = revolve(axis=Axis((9.526279442, 3, 5.5), (0, 1, 0)), mode=Mode.PRIVATE)
    chamfer3_piece_1 = split(chamfer3_piece_1, bisect_by=Plane(origin=(9.526279442, 3.75, 8.610629441), z_dir=(0, -1, 0)), keep=Keep.TOP, mode=Mode.PRIVATE)
    add(chamfer3_piece_1)
    with BuildSketch(Plane(origin=(0, 3, -11), x_dir=(0, 0, -1), z_dir=(1, 0, 0))) as chamfer3_piece_2_section:
        Polygon((2.5 + CHAMFER3_SIZE, 0), (2.5, CHAMFER3_SIZE), (2.5, 0), align=None)
    chamfer3_piece_2 = revolve(axis=Axis((0, 3, -11), (0, 1, 0)), mode=Mode.PRIVATE)
    chamfer3_piece_2 = split(chamfer3_piece_2, bisect_by=Plane(origin=(0, 3.75, -7.889370559), z_dir=(0, -1, 0)), keep=Keep.TOP, mode=Mode.PRIVATE)
    add(chamfer3_piece_2)
    with BuildSketch(Plane(origin=(-9.526279442, 3, 5.5), x_dir=(0, 0, -1), z_dir=(1, 0, 0))) as chamfer3_piece_3_section:
        Polygon((2.5 + CHAMFER3_SIZE, 0), (2.5, CHAMFER3_SIZE), (2.5, 0), align=None)
    chamfer3_piece_3 = revolve(axis=Axis((-9.526279442, 3, 5.5), (0, 1, 0)), mode=Mode.PRIVATE)
    chamfer3_piece_3 = split(chamfer3_piece_3, bisect_by=Plane(origin=(-9.526279442, 3.75, 8.610629441), z_dir=(0, -1, 0)), keep=Keep.TOP, mode=Mode.PRIVATE)
    add(chamfer3_piece_3)
    with BuildSketch(Plane(origin=(9.526279442, 13, 5.5), x_dir=(0, 0, -1), z_dir=(-1, 0, 0))) as chamfer3_piece_4_section:
        Polygon((2.5 + CHAMFER3_SIZE, 0), (2.5, CHAMFER3_SIZE), (2.5, 0), align=None)
    chamfer3_piece_4 = revolve(axis=Axis((9.526279442, 13, 5.5), (0, -1, 0)), mode=Mode.PRIVATE)
    chamfer3_piece_4 = split(chamfer3_piece_4, bisect_by=Plane(origin=(9.526279442, 12.25, 8.610629441), z_dir=(0, 1, 0)), keep=Keep.TOP, mode=Mode.PRIVATE)
    add(chamfer3_piece_4)
    with BuildSketch(Plane(origin=(0, 13, -11), x_dir=(0, 0, -1), z_dir=(-1, 0, 0))) as chamfer3_piece_5_section:
        Polygon((2.5 + CHAMFER3_SIZE, 0), (2.5, CHAMFER3_SIZE), (2.5, 0), align=None)
    chamfer3_piece_5 = revolve(axis=Axis((0, 13, -11), (0, -1, 0)), mode=Mode.PRIVATE)
    chamfer3_piece_5 = split(chamfer3_piece_5, bisect_by=Plane(origin=(0, 12.25, -7.889370559), z_dir=(0, 1, 0)), keep=Keep.TOP, mode=Mode.PRIVATE)
    add(chamfer3_piece_5)
    with BuildSketch(Plane(origin=(-9.526279442, 13, 5.5), x_dir=(0, 0, -1), z_dir=(-1, 0, 0))) as chamfer3_piece_6_section:
        Polygon((2.5 + CHAMFER3_SIZE, 0), (2.5, CHAMFER3_SIZE), (2.5, 0), align=None)
    chamfer3_piece_6 = revolve(axis=Axis((-9.526279442, 13, 5.5), (0, -1, 0)), mode=Mode.PRIVATE)
    chamfer3_piece_6 = split(chamfer3_piece_6, bisect_by=Plane(origin=(-9.526279442, 12.25, 8.610629441), z_dir=(0, 1, 0)), keep=Keep.TOP, mode=Mode.PRIVATE)
    add(chamfer3_piece_6)

    # Sketch12 → Cut-Extrude5 (cut)
    # profile 1 of 3: a face of its own
    with BuildSketch(Plane(origin=(0, 18, 0), x_dir=(1, 0, 0), z_dir=(0, 1, 0))):
        Polygon((3.75, 13.165063509), (0, 15.330127019), (-3.75, 13.165063509), (-3.75, 8.834936491), (0, 6.669872981), (3.75, 8.834936491), align=None)
        Polygon((2.75, 12.58771324), (0, 14.175426481), (-2.75, 12.58771324), (-2.75, 9.41228676), (0, 7.824573519), (2.75, 9.41228676), align=None, mode=Mode.SUBTRACT)
    # profile 2 of 3: a face of its own
    with BuildSketch(Plane(origin=(0, 18, 0), x_dir=(1, 0, 0), z_dir=(0, 1, 0))):
        Polygon((9.526279442, -9.830127019), (13.276279442, -7.665063509), (13.276279442, -3.334936491), (9.526279442, -1.169872981), (5.776279442, -3.334936491), (5.776279442, -7.665063509), align=None)
        Polygon((9.526279442, -8.675426481), (12.276279442, -7.08771324), (12.276279442, -3.91228676), (9.526279442, -2.324573519), (6.776279442, -3.91228676), (6.776279442, -7.08771324), align=None, mode=Mode.SUBTRACT)
    # profile 3 of 3: a face of its own
    with BuildSketch(Plane(origin=(0, 18, 0), x_dir=(1, 0, 0), z_dir=(0, 1, 0))):
        Polygon((-13.276279442, -3.334936491), (-13.276279442, -7.665063509), (-9.526279442, -9.830127019), (-5.776279442, -7.665063509), (-5.776279442, -3.334936491), (-9.526279442, -1.169872981), align=None)
        Polygon((-12.276279442, -3.91228676), (-12.276279442, -7.08771324), (-9.526279442, -8.675426481), (-6.776279442, -7.08771324), (-6.776279442, -3.91228676), (-9.526279442, -2.324573519), align=None, mode=Mode.SUBTRACT)
    extrude(amount=-CUT_EXTRUDE5_DEPTH, mode=Mode.SUBTRACT)

    # Chamfer4
    chamfer4_edges = [part.edges().sort_by_distance(p)[0] for p in [
        (0, 3, -5.5),
        (0, 13, -5.5),
    ]]
    chamfer(chamfer4_edges, length=CHAMFER4_SIZE)

    # Chamfer5
    chamfer5_edges = [part.edges().sort_by_distance(p)[0] for p in [
        (0, 16, -2.7),
        (0, 3, -2.7),
    ]]
    chamfer(chamfer5_edges, length=CHAMFER5_SIZE)


solid = part.part
